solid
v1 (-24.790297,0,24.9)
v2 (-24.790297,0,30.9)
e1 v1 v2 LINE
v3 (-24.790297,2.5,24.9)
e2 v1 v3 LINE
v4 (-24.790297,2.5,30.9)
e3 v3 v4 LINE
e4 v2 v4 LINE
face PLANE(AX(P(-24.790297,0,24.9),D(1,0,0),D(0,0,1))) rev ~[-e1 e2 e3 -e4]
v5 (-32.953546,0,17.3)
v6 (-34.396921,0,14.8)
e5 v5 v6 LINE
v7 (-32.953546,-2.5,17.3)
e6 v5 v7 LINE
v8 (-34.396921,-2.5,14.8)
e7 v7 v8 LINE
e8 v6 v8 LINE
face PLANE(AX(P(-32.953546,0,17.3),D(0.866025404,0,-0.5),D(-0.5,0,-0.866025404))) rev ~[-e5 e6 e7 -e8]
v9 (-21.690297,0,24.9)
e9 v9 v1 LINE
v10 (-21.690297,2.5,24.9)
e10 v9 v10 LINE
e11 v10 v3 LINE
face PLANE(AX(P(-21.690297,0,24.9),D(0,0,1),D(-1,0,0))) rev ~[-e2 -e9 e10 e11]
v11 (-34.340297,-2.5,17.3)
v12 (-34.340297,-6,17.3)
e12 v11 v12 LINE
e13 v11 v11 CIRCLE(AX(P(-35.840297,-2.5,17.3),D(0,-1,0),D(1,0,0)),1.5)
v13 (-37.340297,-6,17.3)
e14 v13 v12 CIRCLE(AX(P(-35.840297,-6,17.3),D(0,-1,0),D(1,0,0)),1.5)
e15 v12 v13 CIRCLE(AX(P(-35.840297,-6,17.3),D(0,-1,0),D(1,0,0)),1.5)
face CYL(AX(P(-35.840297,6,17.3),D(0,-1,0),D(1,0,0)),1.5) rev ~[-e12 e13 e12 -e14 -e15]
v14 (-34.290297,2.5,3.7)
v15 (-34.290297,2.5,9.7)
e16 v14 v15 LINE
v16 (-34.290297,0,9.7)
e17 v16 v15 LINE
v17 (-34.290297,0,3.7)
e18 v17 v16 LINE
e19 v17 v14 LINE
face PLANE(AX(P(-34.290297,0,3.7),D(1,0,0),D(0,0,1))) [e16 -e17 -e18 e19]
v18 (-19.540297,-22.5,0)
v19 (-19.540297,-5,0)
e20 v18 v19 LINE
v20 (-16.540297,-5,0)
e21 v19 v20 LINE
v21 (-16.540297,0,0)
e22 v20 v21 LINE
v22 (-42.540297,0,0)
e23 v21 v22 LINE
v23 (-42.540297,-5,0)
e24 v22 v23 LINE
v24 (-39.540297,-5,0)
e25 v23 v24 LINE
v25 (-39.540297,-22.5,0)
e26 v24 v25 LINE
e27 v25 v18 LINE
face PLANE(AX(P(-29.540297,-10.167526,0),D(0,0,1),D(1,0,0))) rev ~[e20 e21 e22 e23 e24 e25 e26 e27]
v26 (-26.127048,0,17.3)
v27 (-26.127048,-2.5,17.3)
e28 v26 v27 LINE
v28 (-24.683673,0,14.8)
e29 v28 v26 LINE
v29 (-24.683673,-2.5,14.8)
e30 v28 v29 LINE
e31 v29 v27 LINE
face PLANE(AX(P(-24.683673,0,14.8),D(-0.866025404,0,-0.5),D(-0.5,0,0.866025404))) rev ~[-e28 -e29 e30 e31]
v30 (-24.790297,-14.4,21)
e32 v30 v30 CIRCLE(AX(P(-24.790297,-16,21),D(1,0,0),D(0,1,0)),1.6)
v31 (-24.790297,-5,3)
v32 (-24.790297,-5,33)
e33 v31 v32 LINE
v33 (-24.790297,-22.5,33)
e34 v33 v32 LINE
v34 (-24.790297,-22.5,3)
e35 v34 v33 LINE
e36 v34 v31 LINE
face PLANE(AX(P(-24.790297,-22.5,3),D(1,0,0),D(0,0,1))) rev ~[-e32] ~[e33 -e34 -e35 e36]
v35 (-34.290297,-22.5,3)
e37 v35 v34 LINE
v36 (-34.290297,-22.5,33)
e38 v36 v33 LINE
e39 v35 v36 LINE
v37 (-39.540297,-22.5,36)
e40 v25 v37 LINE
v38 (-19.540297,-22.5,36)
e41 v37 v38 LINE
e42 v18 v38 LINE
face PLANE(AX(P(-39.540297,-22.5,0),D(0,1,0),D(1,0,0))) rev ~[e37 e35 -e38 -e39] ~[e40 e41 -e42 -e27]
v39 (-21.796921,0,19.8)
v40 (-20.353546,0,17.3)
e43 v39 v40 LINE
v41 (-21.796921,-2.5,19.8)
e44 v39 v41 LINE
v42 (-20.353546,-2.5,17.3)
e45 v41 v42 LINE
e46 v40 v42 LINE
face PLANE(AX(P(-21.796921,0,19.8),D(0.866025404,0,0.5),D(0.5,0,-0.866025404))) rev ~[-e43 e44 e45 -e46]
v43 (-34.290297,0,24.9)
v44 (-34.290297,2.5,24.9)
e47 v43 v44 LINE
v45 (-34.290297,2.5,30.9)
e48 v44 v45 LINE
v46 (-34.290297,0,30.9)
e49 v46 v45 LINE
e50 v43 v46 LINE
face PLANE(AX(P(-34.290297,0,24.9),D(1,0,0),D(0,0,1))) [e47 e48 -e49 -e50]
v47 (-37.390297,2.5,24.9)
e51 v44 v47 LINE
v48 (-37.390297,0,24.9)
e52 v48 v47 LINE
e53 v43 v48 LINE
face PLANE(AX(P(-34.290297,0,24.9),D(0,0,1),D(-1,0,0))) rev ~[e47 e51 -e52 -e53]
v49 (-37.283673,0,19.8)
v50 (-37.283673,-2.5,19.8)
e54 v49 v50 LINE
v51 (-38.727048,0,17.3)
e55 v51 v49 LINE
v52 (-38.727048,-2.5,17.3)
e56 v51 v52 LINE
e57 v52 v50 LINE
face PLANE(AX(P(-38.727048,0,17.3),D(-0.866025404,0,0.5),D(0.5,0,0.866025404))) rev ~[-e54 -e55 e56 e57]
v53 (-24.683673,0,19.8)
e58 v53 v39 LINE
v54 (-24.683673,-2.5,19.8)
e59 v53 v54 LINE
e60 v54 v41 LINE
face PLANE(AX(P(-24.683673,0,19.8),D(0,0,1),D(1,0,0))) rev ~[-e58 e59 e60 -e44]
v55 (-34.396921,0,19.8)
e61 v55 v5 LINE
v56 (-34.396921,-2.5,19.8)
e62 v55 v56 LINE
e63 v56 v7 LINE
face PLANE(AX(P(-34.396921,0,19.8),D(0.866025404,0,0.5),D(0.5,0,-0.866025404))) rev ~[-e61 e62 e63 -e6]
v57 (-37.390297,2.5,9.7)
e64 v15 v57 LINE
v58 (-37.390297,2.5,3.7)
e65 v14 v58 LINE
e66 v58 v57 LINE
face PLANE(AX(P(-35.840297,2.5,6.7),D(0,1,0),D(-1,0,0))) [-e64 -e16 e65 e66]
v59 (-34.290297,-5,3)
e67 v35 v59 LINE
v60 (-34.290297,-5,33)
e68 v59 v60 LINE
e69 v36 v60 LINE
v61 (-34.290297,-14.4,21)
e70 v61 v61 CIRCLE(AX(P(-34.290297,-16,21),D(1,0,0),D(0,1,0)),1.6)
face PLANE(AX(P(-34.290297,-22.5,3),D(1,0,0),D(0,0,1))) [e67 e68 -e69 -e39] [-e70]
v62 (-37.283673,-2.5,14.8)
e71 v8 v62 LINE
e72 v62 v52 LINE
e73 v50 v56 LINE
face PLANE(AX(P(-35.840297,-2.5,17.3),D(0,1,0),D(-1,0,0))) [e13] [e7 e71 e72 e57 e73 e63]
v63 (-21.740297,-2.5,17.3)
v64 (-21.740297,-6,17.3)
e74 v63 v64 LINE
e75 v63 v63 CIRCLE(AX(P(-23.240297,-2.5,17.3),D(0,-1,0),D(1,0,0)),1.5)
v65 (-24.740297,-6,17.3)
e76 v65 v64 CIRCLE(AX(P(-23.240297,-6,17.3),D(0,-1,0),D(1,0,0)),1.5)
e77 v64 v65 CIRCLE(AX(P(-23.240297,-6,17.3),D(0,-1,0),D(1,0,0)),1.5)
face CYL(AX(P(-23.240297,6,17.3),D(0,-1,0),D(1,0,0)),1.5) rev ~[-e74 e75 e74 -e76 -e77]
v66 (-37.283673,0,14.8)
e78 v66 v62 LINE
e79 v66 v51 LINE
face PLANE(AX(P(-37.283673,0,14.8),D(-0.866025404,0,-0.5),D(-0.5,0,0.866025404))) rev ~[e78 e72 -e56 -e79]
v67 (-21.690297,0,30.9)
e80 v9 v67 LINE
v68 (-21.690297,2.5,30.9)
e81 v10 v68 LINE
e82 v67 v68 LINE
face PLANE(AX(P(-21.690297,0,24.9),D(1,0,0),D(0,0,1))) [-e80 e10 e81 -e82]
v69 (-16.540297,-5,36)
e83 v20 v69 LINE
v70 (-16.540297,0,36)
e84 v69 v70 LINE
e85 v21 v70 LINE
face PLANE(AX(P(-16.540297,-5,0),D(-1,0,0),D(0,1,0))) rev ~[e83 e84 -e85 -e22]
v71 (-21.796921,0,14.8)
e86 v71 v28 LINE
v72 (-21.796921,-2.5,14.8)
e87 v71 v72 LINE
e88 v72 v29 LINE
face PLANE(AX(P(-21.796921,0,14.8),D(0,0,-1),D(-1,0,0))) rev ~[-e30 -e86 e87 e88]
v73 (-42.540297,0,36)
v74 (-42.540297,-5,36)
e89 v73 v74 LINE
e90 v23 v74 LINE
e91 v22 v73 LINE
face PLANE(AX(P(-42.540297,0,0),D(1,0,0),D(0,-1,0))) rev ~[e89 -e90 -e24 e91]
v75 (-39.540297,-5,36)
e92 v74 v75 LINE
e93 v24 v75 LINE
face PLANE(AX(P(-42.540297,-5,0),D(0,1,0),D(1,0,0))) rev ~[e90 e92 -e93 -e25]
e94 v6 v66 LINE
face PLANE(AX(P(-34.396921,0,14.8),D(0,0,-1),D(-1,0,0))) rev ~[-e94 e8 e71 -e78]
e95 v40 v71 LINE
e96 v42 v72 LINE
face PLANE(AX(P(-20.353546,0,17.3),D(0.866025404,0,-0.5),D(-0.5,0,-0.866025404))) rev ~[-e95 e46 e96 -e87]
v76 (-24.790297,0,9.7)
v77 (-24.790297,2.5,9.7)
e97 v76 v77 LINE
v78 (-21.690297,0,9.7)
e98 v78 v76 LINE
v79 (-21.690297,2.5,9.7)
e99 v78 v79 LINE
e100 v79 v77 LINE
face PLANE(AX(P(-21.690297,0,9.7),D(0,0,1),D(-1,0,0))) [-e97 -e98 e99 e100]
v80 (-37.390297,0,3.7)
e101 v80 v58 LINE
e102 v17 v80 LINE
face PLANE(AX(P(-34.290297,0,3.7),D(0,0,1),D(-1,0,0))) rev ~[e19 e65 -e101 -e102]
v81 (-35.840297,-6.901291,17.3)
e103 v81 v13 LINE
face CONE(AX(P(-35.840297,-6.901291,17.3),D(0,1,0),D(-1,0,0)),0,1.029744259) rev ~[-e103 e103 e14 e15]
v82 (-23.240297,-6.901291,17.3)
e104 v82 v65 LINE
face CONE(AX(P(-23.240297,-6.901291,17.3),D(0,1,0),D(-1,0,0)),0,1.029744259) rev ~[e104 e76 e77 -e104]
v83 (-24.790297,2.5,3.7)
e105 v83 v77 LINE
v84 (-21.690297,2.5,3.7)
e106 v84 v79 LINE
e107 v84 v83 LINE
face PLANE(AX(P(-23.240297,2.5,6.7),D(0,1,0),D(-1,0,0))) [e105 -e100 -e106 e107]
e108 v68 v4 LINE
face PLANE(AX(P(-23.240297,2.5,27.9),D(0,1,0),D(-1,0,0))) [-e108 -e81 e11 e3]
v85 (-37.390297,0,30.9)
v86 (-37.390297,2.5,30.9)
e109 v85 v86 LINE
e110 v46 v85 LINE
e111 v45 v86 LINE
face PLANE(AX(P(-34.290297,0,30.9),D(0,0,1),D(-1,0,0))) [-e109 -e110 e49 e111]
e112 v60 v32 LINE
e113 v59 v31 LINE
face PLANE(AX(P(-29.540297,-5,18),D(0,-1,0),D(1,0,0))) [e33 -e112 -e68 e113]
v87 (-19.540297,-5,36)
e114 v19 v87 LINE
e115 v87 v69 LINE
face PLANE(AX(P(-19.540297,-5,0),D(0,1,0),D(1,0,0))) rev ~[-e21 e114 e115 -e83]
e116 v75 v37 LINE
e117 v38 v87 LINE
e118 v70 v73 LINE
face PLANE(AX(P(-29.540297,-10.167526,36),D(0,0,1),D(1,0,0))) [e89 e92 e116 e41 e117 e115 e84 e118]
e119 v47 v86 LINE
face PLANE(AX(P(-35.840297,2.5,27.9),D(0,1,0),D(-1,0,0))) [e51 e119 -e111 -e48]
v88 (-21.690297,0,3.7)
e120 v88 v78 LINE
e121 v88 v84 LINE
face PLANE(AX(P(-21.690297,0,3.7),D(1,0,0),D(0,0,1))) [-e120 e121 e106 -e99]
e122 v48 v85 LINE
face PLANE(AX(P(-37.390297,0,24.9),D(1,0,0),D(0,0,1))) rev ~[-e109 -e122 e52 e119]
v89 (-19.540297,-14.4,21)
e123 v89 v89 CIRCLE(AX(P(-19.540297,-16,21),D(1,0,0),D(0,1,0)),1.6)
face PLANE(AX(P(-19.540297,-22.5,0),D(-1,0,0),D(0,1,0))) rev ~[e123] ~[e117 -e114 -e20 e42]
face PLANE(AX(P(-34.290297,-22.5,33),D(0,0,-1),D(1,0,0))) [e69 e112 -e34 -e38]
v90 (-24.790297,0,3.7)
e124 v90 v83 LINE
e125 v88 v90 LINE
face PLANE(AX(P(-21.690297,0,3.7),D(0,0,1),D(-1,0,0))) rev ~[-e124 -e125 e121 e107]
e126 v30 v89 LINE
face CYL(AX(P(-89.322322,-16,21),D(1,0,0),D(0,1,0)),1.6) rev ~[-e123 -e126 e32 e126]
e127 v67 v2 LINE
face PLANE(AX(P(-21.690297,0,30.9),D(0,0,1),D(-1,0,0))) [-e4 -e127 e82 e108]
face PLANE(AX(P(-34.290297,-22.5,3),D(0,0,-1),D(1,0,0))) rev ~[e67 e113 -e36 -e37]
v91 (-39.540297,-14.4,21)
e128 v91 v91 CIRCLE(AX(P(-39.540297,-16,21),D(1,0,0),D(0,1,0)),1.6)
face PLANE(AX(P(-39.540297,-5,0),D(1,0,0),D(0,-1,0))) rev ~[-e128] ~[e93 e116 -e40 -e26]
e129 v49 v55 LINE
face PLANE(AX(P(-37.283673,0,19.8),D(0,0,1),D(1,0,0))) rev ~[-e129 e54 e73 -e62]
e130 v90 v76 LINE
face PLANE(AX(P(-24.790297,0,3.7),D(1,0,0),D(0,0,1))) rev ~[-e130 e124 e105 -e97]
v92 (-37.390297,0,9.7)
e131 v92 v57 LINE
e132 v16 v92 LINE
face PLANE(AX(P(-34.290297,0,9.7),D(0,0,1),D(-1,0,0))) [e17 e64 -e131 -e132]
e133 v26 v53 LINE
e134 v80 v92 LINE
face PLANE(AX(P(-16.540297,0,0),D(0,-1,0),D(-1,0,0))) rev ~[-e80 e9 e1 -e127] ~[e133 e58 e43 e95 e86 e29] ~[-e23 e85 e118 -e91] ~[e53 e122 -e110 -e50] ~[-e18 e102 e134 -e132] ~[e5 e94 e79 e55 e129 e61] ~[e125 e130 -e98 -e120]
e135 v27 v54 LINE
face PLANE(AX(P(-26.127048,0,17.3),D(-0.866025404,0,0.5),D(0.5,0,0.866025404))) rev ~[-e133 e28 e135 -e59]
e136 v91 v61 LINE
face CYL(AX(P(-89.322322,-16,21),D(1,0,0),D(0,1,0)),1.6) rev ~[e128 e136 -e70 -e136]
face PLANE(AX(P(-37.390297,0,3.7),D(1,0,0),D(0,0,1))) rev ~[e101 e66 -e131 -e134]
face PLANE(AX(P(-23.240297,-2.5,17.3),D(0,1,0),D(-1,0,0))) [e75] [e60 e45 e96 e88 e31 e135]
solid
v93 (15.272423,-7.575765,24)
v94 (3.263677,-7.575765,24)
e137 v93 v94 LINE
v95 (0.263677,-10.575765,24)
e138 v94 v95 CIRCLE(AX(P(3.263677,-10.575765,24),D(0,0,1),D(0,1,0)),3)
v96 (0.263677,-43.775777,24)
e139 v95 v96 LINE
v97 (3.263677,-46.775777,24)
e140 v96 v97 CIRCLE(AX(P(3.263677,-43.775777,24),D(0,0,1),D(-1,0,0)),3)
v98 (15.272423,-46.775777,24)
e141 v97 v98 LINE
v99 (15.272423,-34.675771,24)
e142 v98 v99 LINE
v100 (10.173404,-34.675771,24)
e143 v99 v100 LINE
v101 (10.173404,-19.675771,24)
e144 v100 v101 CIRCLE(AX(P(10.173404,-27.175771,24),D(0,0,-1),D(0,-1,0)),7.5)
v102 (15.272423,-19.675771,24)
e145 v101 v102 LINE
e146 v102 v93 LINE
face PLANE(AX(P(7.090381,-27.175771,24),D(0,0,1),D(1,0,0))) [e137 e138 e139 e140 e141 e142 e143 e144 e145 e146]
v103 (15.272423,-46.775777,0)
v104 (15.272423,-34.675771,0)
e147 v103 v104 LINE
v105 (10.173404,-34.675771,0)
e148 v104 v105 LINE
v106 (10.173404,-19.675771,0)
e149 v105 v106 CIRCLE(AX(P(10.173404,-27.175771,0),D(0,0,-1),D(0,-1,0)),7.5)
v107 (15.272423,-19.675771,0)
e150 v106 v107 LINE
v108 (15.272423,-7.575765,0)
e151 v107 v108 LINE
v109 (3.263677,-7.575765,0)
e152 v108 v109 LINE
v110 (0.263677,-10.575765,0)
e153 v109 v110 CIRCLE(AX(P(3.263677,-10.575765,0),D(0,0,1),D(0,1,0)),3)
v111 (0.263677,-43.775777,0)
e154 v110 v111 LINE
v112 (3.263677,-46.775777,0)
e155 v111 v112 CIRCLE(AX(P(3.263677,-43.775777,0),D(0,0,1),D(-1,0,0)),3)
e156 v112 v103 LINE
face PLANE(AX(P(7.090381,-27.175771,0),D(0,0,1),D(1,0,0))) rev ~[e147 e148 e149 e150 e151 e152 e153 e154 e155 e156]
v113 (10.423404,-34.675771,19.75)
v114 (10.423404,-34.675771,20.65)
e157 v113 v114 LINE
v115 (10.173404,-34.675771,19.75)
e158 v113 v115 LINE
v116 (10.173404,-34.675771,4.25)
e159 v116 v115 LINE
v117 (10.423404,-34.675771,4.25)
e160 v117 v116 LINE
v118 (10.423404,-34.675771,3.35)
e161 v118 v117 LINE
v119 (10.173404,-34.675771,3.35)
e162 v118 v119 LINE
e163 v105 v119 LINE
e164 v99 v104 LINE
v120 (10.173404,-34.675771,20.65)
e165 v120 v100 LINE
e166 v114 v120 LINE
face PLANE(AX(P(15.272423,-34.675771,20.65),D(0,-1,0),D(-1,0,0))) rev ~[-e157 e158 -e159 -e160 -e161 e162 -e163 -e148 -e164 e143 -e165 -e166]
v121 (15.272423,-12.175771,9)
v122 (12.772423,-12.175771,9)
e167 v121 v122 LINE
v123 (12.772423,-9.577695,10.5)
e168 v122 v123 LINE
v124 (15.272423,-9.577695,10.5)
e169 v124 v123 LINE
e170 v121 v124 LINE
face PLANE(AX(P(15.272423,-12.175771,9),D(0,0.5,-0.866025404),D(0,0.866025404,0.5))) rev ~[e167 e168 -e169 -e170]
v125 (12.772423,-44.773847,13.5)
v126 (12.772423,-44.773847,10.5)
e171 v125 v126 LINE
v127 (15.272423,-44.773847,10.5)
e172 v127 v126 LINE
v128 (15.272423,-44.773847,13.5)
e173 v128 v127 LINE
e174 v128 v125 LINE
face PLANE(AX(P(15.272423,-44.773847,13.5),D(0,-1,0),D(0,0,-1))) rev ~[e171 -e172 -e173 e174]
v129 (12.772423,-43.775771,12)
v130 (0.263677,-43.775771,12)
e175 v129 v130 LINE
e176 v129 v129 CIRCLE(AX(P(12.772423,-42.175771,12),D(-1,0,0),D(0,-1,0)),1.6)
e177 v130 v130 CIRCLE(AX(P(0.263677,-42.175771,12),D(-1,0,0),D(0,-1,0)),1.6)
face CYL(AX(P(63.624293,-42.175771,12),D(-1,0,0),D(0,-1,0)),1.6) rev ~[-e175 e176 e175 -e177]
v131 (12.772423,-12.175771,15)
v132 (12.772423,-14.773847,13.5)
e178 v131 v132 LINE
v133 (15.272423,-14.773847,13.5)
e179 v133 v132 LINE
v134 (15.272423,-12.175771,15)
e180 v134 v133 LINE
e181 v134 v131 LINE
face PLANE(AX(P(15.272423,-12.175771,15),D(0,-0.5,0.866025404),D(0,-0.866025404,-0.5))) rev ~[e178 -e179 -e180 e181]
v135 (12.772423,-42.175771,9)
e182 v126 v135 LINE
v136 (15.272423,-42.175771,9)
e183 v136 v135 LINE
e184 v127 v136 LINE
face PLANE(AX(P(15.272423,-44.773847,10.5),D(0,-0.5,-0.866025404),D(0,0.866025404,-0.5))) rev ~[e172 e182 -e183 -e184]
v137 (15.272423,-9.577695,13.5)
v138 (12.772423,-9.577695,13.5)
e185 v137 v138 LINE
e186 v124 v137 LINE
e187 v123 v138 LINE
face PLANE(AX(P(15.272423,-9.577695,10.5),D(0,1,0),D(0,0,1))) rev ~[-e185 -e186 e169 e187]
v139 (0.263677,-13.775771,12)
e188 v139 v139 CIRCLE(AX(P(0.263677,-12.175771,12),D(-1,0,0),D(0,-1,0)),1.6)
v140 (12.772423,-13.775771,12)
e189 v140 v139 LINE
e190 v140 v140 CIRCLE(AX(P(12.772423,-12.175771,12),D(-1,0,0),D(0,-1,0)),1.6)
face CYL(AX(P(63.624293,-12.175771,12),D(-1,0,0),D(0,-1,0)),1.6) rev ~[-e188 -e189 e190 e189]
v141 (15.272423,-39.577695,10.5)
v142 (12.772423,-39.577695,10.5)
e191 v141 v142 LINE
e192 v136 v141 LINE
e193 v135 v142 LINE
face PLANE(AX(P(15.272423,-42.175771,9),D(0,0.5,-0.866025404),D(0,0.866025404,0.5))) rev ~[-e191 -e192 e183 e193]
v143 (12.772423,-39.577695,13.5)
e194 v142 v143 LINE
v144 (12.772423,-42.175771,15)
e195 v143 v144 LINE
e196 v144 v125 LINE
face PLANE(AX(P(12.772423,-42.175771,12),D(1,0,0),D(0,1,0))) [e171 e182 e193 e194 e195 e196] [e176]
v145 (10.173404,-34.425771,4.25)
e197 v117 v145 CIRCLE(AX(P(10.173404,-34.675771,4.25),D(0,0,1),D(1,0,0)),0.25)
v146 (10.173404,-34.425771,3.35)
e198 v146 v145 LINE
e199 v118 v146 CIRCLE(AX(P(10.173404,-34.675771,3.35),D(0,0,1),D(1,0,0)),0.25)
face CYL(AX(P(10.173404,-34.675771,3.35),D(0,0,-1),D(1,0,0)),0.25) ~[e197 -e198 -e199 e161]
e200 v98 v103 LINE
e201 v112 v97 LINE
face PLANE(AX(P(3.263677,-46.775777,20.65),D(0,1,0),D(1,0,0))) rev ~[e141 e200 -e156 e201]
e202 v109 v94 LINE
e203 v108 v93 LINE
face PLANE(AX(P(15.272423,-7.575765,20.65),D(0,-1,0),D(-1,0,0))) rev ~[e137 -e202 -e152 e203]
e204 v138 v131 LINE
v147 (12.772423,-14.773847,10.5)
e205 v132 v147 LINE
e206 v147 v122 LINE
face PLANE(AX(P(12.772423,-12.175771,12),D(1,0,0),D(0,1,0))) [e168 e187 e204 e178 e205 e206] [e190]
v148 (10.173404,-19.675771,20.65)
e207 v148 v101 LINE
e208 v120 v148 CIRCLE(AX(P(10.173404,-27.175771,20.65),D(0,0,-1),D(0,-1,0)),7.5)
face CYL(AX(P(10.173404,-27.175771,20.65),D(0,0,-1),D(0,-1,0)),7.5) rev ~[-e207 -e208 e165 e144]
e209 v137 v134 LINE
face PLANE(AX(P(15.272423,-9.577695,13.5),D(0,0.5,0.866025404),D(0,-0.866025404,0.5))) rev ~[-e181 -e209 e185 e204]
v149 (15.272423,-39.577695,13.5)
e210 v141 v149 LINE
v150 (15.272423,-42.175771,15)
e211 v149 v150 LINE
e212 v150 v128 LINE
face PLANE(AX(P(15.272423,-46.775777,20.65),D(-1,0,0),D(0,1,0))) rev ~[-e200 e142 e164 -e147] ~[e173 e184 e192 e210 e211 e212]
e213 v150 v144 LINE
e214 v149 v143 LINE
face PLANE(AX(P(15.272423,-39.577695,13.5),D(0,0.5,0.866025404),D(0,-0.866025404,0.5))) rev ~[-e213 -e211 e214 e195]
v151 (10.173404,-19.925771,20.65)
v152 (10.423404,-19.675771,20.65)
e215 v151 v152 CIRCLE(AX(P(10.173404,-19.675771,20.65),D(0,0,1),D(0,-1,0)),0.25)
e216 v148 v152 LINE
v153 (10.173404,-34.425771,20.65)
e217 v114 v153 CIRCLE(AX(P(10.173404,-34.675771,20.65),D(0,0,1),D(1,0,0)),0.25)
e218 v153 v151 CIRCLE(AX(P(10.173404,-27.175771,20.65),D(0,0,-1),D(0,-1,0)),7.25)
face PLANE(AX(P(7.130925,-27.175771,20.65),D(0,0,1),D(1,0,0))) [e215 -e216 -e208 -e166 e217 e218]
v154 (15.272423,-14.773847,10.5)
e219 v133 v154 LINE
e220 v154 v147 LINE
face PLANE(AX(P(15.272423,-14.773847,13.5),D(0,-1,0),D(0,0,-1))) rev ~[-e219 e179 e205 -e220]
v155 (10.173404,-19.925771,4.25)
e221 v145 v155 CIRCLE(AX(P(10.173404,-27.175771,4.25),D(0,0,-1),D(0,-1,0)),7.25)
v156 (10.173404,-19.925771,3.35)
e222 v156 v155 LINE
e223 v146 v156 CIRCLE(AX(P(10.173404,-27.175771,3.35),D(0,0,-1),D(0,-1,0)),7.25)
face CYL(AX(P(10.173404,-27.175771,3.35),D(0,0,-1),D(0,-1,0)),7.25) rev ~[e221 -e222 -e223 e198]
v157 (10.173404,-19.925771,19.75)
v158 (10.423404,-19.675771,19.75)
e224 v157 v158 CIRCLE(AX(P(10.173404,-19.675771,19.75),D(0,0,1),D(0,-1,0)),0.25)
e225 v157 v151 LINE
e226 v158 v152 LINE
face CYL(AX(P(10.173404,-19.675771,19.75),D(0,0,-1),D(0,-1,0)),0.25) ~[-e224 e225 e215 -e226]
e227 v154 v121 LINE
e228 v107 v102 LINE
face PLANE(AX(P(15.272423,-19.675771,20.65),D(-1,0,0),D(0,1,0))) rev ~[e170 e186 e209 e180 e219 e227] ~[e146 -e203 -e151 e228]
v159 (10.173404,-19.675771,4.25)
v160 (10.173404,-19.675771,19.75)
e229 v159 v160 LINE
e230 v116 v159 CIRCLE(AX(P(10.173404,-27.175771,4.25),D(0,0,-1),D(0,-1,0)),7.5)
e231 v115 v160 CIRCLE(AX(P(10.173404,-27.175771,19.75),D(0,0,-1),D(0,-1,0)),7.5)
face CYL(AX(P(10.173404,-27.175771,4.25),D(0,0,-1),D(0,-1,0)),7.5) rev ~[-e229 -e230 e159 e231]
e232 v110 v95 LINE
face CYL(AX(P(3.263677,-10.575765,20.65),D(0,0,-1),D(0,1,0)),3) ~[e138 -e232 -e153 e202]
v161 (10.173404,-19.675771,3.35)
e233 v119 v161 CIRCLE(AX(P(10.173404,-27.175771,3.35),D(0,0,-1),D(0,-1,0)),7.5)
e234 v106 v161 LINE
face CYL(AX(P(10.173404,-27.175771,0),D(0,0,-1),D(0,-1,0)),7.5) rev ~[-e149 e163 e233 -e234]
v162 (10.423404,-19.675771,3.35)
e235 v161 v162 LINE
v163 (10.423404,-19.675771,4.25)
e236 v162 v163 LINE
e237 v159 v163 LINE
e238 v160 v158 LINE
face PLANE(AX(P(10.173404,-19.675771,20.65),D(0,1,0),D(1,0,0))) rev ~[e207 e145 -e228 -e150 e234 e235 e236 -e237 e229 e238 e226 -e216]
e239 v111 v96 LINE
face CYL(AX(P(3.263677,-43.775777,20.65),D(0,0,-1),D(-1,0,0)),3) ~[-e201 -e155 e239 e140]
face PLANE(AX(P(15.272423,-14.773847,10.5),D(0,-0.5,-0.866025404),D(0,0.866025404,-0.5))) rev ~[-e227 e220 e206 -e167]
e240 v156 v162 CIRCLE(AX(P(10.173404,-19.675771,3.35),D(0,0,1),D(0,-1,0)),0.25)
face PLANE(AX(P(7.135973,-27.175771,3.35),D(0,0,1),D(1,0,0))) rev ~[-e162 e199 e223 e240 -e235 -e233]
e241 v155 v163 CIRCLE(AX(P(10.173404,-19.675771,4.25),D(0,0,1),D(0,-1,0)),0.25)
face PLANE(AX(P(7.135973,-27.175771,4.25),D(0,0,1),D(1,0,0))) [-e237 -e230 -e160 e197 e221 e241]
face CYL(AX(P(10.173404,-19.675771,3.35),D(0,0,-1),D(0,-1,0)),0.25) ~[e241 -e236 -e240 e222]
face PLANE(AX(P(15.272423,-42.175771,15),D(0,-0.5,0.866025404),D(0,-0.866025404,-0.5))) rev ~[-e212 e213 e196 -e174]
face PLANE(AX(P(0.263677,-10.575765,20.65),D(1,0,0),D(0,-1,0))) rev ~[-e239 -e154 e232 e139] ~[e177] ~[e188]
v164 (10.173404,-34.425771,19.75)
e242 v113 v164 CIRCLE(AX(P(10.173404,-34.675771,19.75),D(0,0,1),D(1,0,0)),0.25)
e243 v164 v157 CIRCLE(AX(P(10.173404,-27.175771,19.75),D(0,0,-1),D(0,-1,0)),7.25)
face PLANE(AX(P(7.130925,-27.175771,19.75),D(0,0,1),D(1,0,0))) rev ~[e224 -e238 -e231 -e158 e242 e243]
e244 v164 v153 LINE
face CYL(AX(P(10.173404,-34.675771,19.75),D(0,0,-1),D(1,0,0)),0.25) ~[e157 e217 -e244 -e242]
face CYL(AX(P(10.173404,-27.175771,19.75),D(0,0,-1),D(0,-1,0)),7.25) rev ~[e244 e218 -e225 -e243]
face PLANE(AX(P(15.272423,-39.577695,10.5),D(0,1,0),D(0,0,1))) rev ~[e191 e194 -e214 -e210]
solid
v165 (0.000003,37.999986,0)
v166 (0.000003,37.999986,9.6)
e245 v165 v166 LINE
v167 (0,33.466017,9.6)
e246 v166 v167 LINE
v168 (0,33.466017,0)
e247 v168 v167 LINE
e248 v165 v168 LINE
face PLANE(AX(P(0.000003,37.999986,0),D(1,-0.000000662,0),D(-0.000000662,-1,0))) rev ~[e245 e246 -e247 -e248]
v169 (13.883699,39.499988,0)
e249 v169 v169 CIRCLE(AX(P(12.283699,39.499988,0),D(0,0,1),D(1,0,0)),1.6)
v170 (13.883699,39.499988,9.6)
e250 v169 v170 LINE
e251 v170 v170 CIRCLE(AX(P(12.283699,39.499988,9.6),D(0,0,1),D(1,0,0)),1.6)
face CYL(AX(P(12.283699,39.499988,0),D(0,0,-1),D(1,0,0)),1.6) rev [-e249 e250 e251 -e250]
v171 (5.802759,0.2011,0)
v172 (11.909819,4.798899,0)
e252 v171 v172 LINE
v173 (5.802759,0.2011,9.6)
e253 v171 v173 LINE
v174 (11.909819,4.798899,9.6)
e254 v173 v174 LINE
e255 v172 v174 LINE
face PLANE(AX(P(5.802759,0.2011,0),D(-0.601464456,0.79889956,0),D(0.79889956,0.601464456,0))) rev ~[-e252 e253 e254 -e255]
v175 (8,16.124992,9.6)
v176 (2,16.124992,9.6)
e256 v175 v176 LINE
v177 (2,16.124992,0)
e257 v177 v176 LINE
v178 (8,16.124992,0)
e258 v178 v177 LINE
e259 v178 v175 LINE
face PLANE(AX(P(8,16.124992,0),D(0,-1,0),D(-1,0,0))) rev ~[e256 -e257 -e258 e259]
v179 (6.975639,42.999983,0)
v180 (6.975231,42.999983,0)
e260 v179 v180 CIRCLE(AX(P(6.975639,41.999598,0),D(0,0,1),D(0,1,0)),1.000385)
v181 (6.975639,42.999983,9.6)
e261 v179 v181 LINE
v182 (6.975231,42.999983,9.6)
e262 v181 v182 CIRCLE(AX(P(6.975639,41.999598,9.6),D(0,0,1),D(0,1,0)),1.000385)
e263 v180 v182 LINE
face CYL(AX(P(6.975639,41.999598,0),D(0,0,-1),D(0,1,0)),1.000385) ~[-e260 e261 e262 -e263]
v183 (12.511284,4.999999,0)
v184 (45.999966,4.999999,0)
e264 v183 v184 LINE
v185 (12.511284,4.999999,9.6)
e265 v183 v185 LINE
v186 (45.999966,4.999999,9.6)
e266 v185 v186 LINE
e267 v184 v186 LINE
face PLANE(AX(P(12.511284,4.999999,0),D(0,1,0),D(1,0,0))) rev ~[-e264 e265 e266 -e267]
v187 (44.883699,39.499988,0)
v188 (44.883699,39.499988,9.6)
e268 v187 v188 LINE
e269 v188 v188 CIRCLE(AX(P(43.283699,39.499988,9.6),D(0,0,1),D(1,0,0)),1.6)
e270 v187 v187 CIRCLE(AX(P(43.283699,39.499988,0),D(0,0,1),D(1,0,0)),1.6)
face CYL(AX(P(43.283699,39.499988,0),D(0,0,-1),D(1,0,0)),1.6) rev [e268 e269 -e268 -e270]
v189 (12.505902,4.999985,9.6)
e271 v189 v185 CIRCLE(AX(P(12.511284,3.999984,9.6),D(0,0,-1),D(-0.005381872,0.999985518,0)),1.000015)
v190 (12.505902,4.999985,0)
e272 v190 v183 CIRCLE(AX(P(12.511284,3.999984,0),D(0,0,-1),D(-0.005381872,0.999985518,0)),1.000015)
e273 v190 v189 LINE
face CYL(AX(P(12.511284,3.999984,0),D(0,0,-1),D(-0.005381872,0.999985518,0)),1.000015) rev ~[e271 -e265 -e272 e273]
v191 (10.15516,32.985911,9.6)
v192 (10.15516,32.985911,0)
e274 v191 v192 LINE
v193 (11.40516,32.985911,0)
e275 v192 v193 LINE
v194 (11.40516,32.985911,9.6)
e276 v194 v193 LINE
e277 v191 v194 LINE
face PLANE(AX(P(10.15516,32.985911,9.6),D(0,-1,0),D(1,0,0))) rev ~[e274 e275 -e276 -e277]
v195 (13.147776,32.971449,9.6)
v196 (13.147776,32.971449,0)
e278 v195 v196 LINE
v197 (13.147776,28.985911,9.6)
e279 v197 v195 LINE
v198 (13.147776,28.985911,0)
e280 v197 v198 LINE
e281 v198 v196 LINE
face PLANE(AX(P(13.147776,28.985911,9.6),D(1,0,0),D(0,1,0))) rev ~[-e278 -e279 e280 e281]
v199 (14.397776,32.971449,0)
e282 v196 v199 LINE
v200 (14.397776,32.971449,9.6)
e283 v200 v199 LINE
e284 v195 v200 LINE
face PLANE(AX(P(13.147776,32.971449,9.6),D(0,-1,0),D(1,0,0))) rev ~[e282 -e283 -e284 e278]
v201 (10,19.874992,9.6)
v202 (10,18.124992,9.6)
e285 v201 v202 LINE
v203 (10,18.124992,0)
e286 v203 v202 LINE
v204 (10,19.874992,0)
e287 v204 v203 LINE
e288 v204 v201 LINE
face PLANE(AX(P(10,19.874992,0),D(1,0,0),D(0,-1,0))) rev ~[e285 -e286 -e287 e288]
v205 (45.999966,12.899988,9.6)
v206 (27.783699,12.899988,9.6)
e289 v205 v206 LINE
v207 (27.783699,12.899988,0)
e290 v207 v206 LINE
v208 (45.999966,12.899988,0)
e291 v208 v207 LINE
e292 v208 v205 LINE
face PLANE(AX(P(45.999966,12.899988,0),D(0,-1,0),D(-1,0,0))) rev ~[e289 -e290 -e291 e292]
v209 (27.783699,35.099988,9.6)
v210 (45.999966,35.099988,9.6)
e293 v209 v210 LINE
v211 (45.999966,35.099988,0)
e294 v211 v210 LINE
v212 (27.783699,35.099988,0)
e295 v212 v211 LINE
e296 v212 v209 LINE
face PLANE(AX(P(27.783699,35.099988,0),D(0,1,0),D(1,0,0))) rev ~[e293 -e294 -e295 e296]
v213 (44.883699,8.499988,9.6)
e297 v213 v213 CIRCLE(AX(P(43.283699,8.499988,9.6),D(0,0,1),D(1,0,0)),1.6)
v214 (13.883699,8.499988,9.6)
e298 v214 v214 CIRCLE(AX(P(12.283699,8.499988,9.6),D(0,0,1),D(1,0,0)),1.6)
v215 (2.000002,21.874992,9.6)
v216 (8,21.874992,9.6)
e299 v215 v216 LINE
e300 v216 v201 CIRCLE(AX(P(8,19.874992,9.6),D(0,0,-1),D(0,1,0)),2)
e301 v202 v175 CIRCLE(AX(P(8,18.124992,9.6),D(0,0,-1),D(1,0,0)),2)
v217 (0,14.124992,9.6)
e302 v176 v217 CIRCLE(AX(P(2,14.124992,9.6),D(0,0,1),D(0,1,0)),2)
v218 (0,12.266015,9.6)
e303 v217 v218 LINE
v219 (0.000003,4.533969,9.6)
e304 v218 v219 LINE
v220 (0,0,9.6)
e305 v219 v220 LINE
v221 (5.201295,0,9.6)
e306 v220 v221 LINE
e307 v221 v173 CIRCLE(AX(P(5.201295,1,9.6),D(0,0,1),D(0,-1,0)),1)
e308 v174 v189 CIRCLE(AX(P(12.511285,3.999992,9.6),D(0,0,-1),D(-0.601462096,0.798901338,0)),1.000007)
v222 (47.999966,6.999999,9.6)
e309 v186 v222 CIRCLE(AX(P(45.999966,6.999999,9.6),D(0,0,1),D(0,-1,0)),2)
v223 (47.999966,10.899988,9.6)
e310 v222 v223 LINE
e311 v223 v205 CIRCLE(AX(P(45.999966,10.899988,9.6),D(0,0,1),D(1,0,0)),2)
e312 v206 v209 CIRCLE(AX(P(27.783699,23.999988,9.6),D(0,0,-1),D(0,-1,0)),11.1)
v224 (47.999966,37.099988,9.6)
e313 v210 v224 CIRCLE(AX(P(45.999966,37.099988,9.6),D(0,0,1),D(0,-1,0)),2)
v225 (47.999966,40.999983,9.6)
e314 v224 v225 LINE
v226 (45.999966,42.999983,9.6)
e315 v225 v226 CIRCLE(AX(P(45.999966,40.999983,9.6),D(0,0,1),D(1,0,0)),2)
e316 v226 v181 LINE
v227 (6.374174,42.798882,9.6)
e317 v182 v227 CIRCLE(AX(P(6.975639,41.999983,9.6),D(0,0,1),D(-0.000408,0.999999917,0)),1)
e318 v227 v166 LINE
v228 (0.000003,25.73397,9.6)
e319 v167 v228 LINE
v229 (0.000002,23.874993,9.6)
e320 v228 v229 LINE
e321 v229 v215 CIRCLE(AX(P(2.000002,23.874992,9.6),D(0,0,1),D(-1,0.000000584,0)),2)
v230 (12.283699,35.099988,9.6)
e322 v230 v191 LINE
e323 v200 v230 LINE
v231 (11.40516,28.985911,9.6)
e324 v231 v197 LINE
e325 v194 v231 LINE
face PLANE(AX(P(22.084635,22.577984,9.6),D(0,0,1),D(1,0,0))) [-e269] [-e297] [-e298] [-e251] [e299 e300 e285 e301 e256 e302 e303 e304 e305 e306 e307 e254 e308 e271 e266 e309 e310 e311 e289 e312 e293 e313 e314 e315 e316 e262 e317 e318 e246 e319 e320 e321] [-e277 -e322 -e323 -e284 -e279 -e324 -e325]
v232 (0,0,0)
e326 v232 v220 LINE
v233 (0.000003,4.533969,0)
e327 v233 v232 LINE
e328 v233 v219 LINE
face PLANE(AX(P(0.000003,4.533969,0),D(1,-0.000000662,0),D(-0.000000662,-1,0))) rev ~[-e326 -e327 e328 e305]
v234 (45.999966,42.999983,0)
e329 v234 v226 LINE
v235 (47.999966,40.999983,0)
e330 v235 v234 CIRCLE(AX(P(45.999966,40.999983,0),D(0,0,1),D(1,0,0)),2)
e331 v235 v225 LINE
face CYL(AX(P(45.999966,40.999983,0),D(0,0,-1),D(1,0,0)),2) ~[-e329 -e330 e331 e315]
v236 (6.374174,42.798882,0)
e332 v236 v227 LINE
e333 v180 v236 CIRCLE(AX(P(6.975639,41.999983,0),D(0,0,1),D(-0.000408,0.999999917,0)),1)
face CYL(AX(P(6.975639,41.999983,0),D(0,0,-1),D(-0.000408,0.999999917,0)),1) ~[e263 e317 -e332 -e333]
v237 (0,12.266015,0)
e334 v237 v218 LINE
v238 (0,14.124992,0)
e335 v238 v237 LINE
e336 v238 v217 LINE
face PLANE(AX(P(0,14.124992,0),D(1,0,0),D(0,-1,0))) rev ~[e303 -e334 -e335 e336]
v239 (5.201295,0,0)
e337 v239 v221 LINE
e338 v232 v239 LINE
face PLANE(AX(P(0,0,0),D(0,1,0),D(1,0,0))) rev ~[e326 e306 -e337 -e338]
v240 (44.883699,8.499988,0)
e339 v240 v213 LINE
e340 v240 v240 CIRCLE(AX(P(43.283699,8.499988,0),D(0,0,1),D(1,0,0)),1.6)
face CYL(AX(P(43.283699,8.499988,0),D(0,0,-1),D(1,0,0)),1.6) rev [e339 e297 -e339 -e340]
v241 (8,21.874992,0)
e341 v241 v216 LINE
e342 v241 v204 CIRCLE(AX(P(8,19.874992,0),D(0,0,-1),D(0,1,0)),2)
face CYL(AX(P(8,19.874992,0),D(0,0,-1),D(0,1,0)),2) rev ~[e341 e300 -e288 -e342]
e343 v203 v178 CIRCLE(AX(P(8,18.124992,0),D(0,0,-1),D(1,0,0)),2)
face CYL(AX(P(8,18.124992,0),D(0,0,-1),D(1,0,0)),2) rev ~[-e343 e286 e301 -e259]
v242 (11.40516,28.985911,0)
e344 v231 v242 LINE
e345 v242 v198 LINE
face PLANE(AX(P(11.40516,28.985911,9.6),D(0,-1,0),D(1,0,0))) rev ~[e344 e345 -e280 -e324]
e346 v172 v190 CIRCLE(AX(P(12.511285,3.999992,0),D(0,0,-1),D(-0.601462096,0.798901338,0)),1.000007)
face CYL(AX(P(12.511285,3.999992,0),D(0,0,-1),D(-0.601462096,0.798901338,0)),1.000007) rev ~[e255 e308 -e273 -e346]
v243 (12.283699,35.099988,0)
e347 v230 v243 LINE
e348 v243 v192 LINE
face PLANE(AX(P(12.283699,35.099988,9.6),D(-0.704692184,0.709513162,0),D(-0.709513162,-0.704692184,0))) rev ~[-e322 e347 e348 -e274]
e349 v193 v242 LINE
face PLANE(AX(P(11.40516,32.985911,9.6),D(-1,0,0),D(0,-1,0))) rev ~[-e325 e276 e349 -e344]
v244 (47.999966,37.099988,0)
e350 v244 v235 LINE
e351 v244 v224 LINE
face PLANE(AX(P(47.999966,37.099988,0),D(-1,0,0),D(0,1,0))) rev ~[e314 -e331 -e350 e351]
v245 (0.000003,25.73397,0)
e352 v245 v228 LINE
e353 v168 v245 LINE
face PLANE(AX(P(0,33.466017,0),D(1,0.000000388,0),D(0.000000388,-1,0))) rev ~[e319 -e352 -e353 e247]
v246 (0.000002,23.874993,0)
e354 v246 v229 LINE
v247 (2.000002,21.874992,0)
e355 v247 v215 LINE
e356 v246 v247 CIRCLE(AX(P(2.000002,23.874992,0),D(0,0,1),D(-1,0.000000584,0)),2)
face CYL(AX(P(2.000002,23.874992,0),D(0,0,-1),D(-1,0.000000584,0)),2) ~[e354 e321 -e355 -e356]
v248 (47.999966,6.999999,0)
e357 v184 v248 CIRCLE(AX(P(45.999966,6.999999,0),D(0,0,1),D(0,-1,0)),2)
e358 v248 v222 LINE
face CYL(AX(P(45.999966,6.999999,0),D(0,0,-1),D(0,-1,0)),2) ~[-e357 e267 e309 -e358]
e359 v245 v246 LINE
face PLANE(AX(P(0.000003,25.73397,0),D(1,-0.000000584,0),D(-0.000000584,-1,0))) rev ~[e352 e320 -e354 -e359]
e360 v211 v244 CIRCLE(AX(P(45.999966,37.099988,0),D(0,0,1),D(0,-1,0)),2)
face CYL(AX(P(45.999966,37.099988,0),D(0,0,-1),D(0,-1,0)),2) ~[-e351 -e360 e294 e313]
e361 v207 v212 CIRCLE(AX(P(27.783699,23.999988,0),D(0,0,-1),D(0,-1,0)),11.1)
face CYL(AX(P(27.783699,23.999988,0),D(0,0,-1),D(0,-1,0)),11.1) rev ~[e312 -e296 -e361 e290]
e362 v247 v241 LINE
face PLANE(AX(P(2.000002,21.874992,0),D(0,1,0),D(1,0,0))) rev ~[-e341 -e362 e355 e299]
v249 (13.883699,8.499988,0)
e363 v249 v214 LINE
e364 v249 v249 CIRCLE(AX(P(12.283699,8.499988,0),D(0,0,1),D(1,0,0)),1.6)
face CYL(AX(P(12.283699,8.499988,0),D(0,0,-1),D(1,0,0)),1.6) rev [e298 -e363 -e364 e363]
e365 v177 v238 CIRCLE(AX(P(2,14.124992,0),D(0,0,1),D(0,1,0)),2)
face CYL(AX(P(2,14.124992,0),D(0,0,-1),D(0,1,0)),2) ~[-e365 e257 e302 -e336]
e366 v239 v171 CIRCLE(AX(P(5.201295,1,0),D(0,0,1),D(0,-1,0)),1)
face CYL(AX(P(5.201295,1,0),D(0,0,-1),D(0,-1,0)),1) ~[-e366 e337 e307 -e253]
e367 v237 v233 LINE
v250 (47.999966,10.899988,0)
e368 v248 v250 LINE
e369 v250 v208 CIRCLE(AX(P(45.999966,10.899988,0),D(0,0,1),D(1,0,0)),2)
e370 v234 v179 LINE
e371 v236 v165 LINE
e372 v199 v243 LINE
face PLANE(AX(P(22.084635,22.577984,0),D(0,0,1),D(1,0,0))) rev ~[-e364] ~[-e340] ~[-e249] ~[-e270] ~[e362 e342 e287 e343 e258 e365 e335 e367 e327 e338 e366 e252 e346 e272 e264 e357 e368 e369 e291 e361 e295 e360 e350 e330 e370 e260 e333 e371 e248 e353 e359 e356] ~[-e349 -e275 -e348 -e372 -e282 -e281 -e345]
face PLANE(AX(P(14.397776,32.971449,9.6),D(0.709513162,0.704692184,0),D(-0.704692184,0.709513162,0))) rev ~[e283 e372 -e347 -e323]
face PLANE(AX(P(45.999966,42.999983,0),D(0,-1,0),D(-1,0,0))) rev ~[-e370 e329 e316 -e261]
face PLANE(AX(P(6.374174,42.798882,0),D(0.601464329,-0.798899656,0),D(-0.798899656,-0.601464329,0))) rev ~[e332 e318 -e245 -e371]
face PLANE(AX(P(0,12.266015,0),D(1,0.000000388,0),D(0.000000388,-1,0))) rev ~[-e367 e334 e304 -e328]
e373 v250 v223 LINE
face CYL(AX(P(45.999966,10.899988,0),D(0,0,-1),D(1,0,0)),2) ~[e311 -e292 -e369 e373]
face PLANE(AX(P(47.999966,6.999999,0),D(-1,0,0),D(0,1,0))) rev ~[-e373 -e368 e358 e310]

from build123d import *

# Parameters (mm, degrees)
F1_R      = 1.6
F2_DEPTH  = 9.6
F4_DEPTH  = 9.601
F6_DEPTH  = 3.35
F8_DEPTH  = 0.9
F10_DEPTH = 15.5
F12_DEPTH = 0.9
F14_DEPTH = 3.35
F16_DEPTH = 2.5
F17_D     = 3.2
F19_DEPTH = 36
F21_D     = 3.2
F22_W     = 9.5
F22_H     = 30
F23_DEPTH = 17.5
F24_W     = 3.1
F24_H     = 6
F25_DEPTH = 2.5
F26_D     = 3
F26_DEPTH = 6
F26_TIP   = 0.9012909285
F28_DEPTH = 2.5


# Not quite as in the source:
# - ends of sketch curves that miss each other by under 0.0002 mm in the source are joined


with BuildPart() as f2:
    # F1 (on Top) → F2 (new body)
    with BuildSketch(Plane.XY):
        with BuildLine():
            Line((8, 16.124992), (7, 16.124992))
            Line((7, 16.124992), (2.999972, 16.124992))
            Line((2.999972, 16.124992), (2, 16.124992))
            ThreePointArc((2, 16.124992), (0.5857864376, 15.5392055624), (0, 14.124992))
            Line((0, 14.124992), (0, 12.266015))
            Line((0, 12.266015), (3e-06, 4.533969))
            Line((3e-06, 4.533969), (0, 0))
            Line((0, 0), (5.201295, 0))
            ThreePointArc((5.201295, 0), (5.5183912482, 0.0516066378), (5.8027589539, 0.2011000612))
            Line((5.8027589539, 0.2011000612), (11.909819, 4.798899))
            ThreePointArc((11.909819, 4.798899), (12.1916364226, 4.9475355039), (12.5059020779, 4.9999845174))
            ThreePointArc((12.5059020779, 4.9999845174), (12.5085930292, 4.9999953793), (12.511284, 4.999999))
            Line((12.511284, 4.999999), (14.511284, 4.999999))
            Line((14.511284, 4.999999), (45.999966, 4.999999))
            ThreePointArc((45.999966, 4.999999), (47.4141795624, 5.5857854376), (47.999966, 6.999999))
            Line((47.999966, 6.999999), (47.999966, 10.899988))
            ThreePointArc((47.999966, 10.899988), (47.4141795624, 12.3142015624), (45.999966, 12.899988))
            Line((45.999966, 12.899988), (27.783699, 12.899988))
            ThreePointArc((27.783699, 12.899988), (16.683699, 23.999988), (27.783699, 35.099988))
            Line((27.783699, 35.099988), (45.999966, 35.099988))
            ThreePointArc((45.999966, 35.099988), (47.4141795624, 35.6857744376), (47.999966, 37.099988))
            Line((47.999966, 37.099988), (47.999966, 40.999983))
            ThreePointArc((47.999966, 40.999983), (47.4141795624, 42.4141965624), (45.999966, 42.999983))
            Line((45.999966, 42.999983), (8.975639, 42.999983))
            Line((8.975639, 42.999983), (7.1237, 42.999983))
            Line((7.1237, 42.999983), (6.980551, 42.999983))
            Line((6.980551, 42.999983), (6.975639, 42.999983))
            ThreePointArc((6.975639, 42.999983), (6.975435, 42.9999829792), (6.975231, 42.9999829168))
            ThreePointArc((6.975231, 42.9999829168), (6.6583489074, 42.9483115281), (6.3741744079, 42.7988824583))
            Line((6.3741744079, 42.7988824583), (3e-06, 37.999986))
            Line((3e-06, 37.999986), (0, 33.466017))
            Line((0, 33.466017), (3e-06, 25.73397))
            Line((3e-06, 25.73397), (1.9137e-06, 23.8749931687))
            ThreePointArc((1.9137e-06, 23.8749931687), (0.5857879382, 22.4607788508), (2.0000019137, 21.874992))
            Line((2.0000019137, 21.874992), (2.999972, 21.874992))
            Line((2.999972, 21.874992), (7, 21.874992))
            Line((7, 21.874992), (8, 21.874992))
            ThreePointArc((8, 21.874992), (9.4142135624, 21.2892055624), (10, 19.874992))
            Line((10, 19.874992), (10, 18.124992))
            ThreePointArc((10, 18.124992), (9.4142135624, 16.7107784376), (8, 16.124992))
        make_face()
        with Locations((12.283699, 8.499988)):
            Circle(F1_R, mode=Mode.SUBTRACT)
        with Locations((43.283699, 8.499988)):
            Circle(F1_R, mode=Mode.SUBTRACT)
        with Locations((12.283699, 39.499988)):
            Circle(F1_R, mode=Mode.SUBTRACT)
        with Locations((43.283699, 39.499988)):
            Circle(F1_R, mode=Mode.SUBTRACT)
    extrude(amount=F2_DEPTH)

    # F3 (on face) → F4 (cut, through all)
    with BuildSketch(Plane.XY.offset(9.6)):
        Polygon((14.3977755507, 32.9714485153), (12.283699, 35.099988), (10.1551595153, 32.9859114493), (11.4051595153, 32.9859114493), (11.4051595153, 28.9859114493), (13.1477755507, 28.9859114493), (13.1477755507, 32.9714485153), align=None)
    extrude(amount=-F4_DEPTH, mode=Mode.SUBTRACT)


with BuildPart() as f6:
    # F5 (on Top) → F6 (new body)
    with BuildSketch(Plane.XY):
        with BuildLine():
            Line((15.2724227719, -46.7757768929), (15.2724227719, -34.6757708929))
            Line((15.2724227719, -34.6757708929), (10.1734037719, -34.6757708929))
            ThreePointArc((10.1734037719, -34.6757708929), (2.6734037719, -27.1757708929), (10.1734037719, -19.6757708929))
            Line((10.1734037719, -19.6757708929), (15.2724227719, -19.6757708929))
            Line((15.2724227719, -19.6757708929), (15.2724227719, -7.5757648929))
            Line((15.2724227719, -7.5757648929), (3.2636767719, -7.5757648929))
            ThreePointArc((3.2636767719, -7.5757648929), (1.1423564283, -8.4544445493), (0.2636767719, -10.5757648929))
            Line((0.2636767719, -10.5757648929), (0.2636767719, -43.7757768929))
            ThreePointArc((0.2636767719, -43.7757768929), (1.1423564283, -45.8970972365), (3.2636767719, -46.7757768929))
            Line((3.2636767719, -46.7757768929), (15.2724227719, -46.7757768929))
        make_face()
    extrude(amount=F6_DEPTH)

    # F7 (on face) → F8 (join)
    with BuildSketch(Plane.XY.offset(3.35)):
        with BuildLine():
            ThreePointArc((10.1734037719, -34.4257708929), (2.9234037719, -27.1757708929), (10.1734037719, -19.9257708929))
            Line((10.1734037719, -19.9257708929), (10.1734037719, -19.6757708929))
            Line((10.1734037719, -19.6757708929), (10.4234037719, -19.6757708929))
            Line((10.4234037719, -19.6757708929), (15.2724227719, -19.6757708929))
            Line((15.2724227719, -19.6757708929), (15.2724227719, -7.5757648929))
            Line((15.2724227719, -7.5757648929), (3.2636767719, -7.5757648929))
            ThreePointArc((3.2636767719, -7.5757648929), (1.1423564283, -8.4544445493), (0.2636767719, -10.5757648929))
            Line((0.2636767719, -10.5757648929), (0.2636767719, -43.7757768929))
            ThreePointArc((0.2636767719, -43.7757768929), (1.1423564283, -45.8970972365), (3.2636767719, -46.7757768929))
            Line((3.2636767719, -46.7757768929), (15.2724227719, -46.7757768929))
            Line((15.2724227719, -46.7757768929), (15.2724227719, -34.6757708929))
            Line((15.2724227719, -34.6757708929), (10.4234037719, -34.6757708929))
            Line((10.4234037719, -34.6757708929), (10.1734037719, -34.6757708929))
            Line((10.1734037719, -34.6757708929), (10.1734037719, -34.4257708929))
        make_face()
        with BuildLine():
            Line((10.1734037719, -19.6757708929), (10.1734037719, -19.9257708929))
            ThreePointArc((10.1734037719, -19.9257708929), (10.3501804672, -19.8525475882), (10.4234037719, -19.6757708929))
            Line((10.4234037719, -19.6757708929), (10.1734037719, -19.6757708929))
        make_face()
        with BuildLine():
            ThreePointArc((10.4234037719, -34.6757708929), (10.3501804672, -34.4989941976), (10.1734037719, -34.4257708929))
            Line((10.1734037719, -34.4257708929), (10.1734037719, -34.6757708929))
            Line((10.1734037719, -34.6757708929), (10.4234037719, -34.6757708929))
        make_face()
    extrude(amount=F8_DEPTH)

    # F9 (on face) → F10 (join)
    with BuildSketch(Plane.XY.offset(4.25)):
        with BuildLine():
            ThreePointArc((10.1734037719, -34.6757708929), (2.6734037719, -27.1757708929), (10.1734037719, -19.6757708929))
            Line((10.1734037719, -19.6757708929), (15.2724227719, -19.6757708929))
            Line((15.2724227719, -19.6757708929), (15.2724227719, -7.5757648929))
            Line((15.2724227719, -7.5757648929), (3.2636767719, -7.5757648929))
            ThreePointArc((3.2636767719, -7.5757648929), (1.1423564283, -8.4544445493), (0.2636767719, -10.5757648929))
            Line((0.2636767719, -10.5757648929), (0.2636767719, -43.7757768929))
            ThreePointArc((0.2636767719, -43.7757768929), (1.1423564283, -45.8970972365), (3.2636767719, -46.7757768929))
            Line((3.2636767719, -46.7757768929), (15.2724227719, -46.7757768929))
            Line((15.2724227719, -46.7757768929), (15.2724227719, -34.6757708929))
            Line((15.2724227719, -34.6757708929), (10.1734037719, -34.6757708929))
        make_face()
    extrude(amount=F10_DEPTH)

    # F11 (on face) → F12 (join)
    with BuildSketch(Plane.XY.offset(19.75)):
        with BuildLine():
            ThreePointArc((10.1734037719, -34.4257708929), (2.9234037719, -27.1757708929), (10.1734037719, -19.9257708929))
            ThreePointArc((10.1734037719, -19.9257708929), (10.3501804672, -19.8525475882), (10.4234037719, -19.6757708929))
            Line((10.4234037719, -19.6757708929), (15.2724227719, -19.6757708929))
            Line((15.2724227719, -19.6757708929), (15.2724227719, -7.5757648929))
            Line((15.2724227719, -7.5757648929), (3.2636767719, -7.5757648929))
            ThreePointArc((3.2636767719, -7.5757648929), (1.1423564283, -8.4544445493), (0.2636767719, -10.5757648929))
            Line((0.2636767719, -10.5757648929), (0.2636767719, -43.7757768929))
            ThreePointArc((0.2636767719, -43.7757768929), (1.1423564283, -45.8970972365), (3.2636767719, -46.7757768929))
            Line((3.2636767719, -46.7757768929), (15.2724227719, -46.7757768929))
            Line((15.2724227719, -46.7757768929), (15.2724227719, -34.6757708929))
            Line((15.2724227719, -34.6757708929), (10.4234037719, -34.6757708929))
            ThreePointArc((10.4234037719, -34.6757708929), (10.3501804672, -34.4989941976), (10.1734037719, -34.4257708929))
        make_face()
    extrude(amount=F12_DEPTH)

    # F13 (on face) → F14 (join)
    with BuildSketch(Plane.XY.offset(20.65)):
        with BuildLine():
            ThreePointArc((10.1734037719, -34.6757708929), (2.6734037719, -27.1757708929), (10.1734037719, -19.6757708929))
            Line((10.1734037719, -19.6757708929), (15.2724227719, -19.6757708929))
            Line((15.2724227719, -19.6757708929), (15.2724227719, -7.5757648929))
            Line((15.2724227719, -7.5757648929), (3.2636767719, -7.5757648929))
            ThreePointArc((3.2636767719, -7.5757648929), (1.1423564283, -8.4544445493), (0.2636767719, -10.5757648929))
            Line((0.2636767719, -10.5757648929), (0.2636767719, -43.7757768929))
            ThreePointArc((0.2636767719, -43.7757768929), (1.1423564283, -45.8970972365), (3.2636767719, -46.7757768929))
            Line((3.2636767719, -46.7757768929), (15.2724227719, -46.7757768929))
            Line((15.2724227719, -46.7757768929), (15.2724227719, -34.6757708929))
            Line((15.2724227719, -34.6757708929), (10.1734037719, -34.6757708929))
        make_face()
    extrude(amount=F14_DEPTH)

    # F15 (on face) → F16 (cut)
    with BuildSketch(Plane.YZ.offset(15.2724227719)):
        Polygon((-39.5776946815, 13.5), (-42.1757708929, 15), (-44.7738471043, 13.5), (-44.7738471043, 10.5), (-42.1757708929, 9), (-39.5776946815, 10.5), align=None)
        Polygon((-9.5776946815, 13.5), (-12.1757708929, 15), (-14.7738471043, 13.5), (-14.7738471043, 10.5), (-12.1757708929, 9), (-9.5776946815, 10.5), align=None)
    extrude(amount=-F16_DEPTH, mode=Mode.SUBTRACT)

    # F17 (through all)
    with Locations(Plane.YZ.offset(15.2724227719)):
        with Locations((-42.1757708929, 12), (-12.1757708929, 12)):
            Hole(F17_D / 2)


with BuildPart() as f19:
    # F18 (on Top) → F19 (new body)
    with BuildSketch(Plane.XY):
        Polygon((-16.5402969122, -5), (-16.5402969122, 0), (-42.5402969122, 0), (-42.5402969122, -5), (-39.5402969122, -5), (-39.5402969122, -22.5), (-19.5402969122, -22.5), (-19.5402969122, -5), align=None)
    extrude(amount=F19_DEPTH)

    # F21 (through all)
    with Locations(Plane(origin=(-39.5402969122, 0, 0), x_dir=(0, -1, 0), z_dir=(-1, 0, 0))):
        with Locations((16, 21)):
            Hole(F21_D / 2)

    # F22 (on face) → F23 (cut)
    with BuildSketch(Plane.XZ.offset(22.5)):
        with Locations((-29.5402969122, 18)):
            Rectangle(F22_W, F22_H)
    extrude(amount=-F23_DEPTH, mode=Mode.SUBTRACT)

    # F24 (on face) → F25 (join)
    with BuildSketch(Plane(origin=(0, 0, 0), x_dir=(-1, 0, 0), z_dir=(0, 1, 0))):
        with Locations((23.2402969122, 27.9)):
            Rectangle(F24_W, F24_H)
        with Locations((35.8402969122, 27.9)):
            Rectangle(F24_W, F24_H)
        with Locations((23.2402969122, 6.7)):
            Rectangle(F24_W, F24_H)
        with Locations((35.8402969122, 6.7)):
            Rectangle(F24_W, F24_H)
    extrude(amount=F25_DEPTH)

    # F26
    with Locations(Plane(origin=(0, 0, 0), x_dir=(-1, 0, 0), z_dir=(0, 1, 0))):
        with Locations((23.2402969122, 17.3), (35.8402969122, 17.3)):
            Hole(F26_D / 2, depth=F26_DEPTH)
            with Locations((0, 0, -(F26_DEPTH + F26_TIP / 2))):  # 118° drill point
                Cone(0, F26_D / 2, F26_TIP, mode=Mode.SUBTRACT)

    # F27 (on face) → F28 (cut)
    with BuildSketch(Plane(origin=(0, 0, 0), x_dir=(-1, 0, 0), z_dir=(0, 1, 0))):
        Polygon((24.6836725852, 19.8), (21.7969212392, 19.8), (20.3535455662, 17.3), (21.7969212392, 14.8), (24.6836725852, 14.8), (26.1270482581, 17.3), align=None)
        Polygon((37.2836725852, 19.8), (34.3969212392, 19.8), (32.9535455662, 17.3), (34.3969212392, 14.8), (37.2836725852, 14.8), (38.7270482581, 17.3), align=None)
    extrude(amount=-F28_DEPTH, mode=Mode.SUBTRACT)


solid = Compound([f2.part, f6.part, f19.part])
